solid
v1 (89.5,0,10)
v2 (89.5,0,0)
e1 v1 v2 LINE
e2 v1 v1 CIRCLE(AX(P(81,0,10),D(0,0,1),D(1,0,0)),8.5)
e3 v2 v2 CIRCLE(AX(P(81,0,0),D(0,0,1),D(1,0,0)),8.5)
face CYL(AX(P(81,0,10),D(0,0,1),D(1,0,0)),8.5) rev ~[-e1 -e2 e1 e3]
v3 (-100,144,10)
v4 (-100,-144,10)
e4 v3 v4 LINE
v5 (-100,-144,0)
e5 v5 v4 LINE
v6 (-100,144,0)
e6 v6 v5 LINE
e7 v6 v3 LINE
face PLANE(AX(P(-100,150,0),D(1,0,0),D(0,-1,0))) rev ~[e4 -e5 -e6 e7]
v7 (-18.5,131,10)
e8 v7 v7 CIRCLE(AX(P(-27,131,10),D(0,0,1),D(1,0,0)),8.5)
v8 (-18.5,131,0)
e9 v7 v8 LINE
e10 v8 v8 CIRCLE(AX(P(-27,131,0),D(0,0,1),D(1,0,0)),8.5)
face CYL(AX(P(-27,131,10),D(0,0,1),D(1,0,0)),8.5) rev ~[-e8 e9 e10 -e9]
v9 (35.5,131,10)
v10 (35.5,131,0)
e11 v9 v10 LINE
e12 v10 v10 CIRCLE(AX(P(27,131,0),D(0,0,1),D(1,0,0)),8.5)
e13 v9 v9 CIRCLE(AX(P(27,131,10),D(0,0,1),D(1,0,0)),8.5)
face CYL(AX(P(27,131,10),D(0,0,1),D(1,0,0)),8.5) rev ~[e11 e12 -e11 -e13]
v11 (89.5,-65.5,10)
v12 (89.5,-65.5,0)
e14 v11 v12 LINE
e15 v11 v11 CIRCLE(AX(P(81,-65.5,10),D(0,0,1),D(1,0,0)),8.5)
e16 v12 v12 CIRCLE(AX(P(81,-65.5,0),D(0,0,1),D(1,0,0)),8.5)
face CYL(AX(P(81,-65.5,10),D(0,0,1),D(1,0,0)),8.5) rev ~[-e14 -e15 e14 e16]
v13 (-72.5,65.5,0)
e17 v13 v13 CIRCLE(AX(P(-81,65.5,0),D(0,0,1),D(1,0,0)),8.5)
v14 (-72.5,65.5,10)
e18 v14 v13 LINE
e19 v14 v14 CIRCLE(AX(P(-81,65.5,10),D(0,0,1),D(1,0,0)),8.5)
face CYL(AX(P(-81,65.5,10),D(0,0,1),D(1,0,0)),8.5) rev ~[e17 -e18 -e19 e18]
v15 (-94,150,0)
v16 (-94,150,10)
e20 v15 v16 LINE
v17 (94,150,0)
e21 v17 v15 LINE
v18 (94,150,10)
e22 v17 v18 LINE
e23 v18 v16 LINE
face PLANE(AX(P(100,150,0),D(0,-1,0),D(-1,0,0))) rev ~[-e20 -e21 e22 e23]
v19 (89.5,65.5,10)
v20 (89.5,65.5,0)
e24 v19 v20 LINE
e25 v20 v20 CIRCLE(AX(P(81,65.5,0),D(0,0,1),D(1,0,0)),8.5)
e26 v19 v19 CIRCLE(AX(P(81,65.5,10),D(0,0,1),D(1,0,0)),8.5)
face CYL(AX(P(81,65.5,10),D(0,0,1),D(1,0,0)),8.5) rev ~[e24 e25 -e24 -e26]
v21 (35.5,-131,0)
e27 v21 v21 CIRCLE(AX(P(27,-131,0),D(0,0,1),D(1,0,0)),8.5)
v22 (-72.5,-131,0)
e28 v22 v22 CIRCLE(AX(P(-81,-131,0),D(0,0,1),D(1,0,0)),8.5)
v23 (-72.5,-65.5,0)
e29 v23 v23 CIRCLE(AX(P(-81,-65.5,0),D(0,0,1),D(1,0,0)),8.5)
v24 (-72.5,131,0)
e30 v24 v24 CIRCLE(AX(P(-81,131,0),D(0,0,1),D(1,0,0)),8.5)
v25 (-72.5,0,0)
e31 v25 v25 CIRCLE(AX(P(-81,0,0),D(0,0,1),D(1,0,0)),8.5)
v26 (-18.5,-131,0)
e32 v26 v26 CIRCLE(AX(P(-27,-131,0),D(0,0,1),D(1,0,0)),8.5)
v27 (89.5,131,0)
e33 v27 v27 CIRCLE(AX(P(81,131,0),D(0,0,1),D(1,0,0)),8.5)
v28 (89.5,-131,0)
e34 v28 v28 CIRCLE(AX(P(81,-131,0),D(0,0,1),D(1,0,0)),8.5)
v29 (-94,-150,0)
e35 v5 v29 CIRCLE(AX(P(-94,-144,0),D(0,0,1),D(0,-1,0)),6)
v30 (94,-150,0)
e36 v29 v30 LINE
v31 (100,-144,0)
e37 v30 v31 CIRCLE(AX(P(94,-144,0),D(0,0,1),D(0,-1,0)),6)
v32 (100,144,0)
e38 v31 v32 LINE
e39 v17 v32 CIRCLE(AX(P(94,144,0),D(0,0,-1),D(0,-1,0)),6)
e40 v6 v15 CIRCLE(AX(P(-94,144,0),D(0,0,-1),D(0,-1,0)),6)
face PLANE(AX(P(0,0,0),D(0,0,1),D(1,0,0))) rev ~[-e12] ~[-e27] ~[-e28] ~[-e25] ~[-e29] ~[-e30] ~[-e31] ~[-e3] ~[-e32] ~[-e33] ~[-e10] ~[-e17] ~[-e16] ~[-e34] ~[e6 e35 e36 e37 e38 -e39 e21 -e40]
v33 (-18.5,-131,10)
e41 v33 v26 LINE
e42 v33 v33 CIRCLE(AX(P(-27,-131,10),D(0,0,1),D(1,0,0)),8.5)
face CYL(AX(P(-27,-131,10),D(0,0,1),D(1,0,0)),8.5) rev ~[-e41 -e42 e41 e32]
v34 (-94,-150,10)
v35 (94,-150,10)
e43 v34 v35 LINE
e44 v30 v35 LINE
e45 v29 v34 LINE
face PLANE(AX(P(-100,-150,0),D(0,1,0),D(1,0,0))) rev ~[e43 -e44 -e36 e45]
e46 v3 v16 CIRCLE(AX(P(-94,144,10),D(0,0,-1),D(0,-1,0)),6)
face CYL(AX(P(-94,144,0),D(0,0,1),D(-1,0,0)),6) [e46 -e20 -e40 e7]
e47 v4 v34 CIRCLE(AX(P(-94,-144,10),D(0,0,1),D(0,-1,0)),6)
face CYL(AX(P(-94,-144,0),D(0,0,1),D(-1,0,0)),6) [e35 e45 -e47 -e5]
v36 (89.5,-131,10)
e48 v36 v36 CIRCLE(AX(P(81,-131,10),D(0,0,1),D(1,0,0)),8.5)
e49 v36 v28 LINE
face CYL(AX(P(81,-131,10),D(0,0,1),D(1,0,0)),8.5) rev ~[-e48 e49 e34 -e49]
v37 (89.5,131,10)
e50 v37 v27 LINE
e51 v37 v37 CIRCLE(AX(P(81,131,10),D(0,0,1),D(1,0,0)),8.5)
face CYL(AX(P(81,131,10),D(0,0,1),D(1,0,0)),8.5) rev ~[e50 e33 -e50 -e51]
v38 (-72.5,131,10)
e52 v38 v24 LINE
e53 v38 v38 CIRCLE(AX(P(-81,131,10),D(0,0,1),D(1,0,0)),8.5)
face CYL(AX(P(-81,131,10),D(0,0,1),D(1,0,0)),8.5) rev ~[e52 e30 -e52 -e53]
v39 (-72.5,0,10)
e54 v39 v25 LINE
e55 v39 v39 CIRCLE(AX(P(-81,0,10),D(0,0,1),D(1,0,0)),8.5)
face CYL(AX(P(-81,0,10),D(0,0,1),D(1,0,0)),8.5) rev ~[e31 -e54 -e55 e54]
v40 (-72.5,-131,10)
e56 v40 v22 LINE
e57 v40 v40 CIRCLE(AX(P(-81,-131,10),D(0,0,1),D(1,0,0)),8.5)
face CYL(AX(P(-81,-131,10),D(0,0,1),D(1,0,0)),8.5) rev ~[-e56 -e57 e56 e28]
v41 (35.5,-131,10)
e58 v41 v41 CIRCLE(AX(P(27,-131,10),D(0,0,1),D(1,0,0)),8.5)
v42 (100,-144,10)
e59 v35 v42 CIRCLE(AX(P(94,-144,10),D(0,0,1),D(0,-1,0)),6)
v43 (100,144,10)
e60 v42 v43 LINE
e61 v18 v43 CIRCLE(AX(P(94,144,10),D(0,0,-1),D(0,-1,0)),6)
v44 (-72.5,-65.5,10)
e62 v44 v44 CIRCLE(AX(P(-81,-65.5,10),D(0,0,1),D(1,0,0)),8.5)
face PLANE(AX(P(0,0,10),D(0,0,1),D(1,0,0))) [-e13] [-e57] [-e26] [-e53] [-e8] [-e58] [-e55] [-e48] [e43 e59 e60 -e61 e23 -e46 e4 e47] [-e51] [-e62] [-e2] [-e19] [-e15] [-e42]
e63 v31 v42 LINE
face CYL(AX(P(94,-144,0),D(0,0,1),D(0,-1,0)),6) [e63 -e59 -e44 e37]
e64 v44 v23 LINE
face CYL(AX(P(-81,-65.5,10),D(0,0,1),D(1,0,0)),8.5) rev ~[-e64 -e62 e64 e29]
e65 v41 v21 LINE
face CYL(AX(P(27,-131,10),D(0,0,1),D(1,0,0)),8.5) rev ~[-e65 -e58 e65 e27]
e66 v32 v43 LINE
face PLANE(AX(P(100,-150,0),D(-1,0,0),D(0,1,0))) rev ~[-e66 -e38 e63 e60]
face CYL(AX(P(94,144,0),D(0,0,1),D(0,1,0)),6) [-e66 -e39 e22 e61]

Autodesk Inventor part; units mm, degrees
ref_plane "YZ Plane" through (0, 0, 0) normal (1, 0, 0) x (0, 1, 0)
ref_plane "XZ Plane" through (0, 0, 0) normal (0, 1, 0) x (-1, 0, 0)
ref_plane "XY Plane" through (0, 0, 0) normal (0, 0, 1) x (1, 0, 0)
sketch "Sketch2" plane through (0, 0, 0) normal (0, 0, 1) x (1, 0, 0)
  line L0 (-50, -100) -> (50, -100)
  line L1 (50, -100) -> (50, 100)
  line L2 (50, 100) -> (-50, 100)
  line L3 (-50, 100) -> (-50, -100)
  line L4 (-50, -100) -> (50, 100) construction
  line L5 (50, -100) -> (-50, 100) construction
  line L6 (-100, -150) -> (100, -150)
  line L7 (100, -150) -> (100, 150)
  line L8 (100, 150) -> (-100, 150)
  line L9 (-100, 150) -> (-100, -150)
  point P0 (0, 0)
  dimension "d29" = 100
  dimension "d30" = 200
  dimension "d31" = 50
extrude "Plate2" add sketch "Sketch2" along normal blind 10 contours L3 L2 L1 L0 | L9 L8 L7 L6
sketch "Sketch5" plane through (0, 0, 10) normal (0, 0, 1) x (1, 0, 0)
  line L0 (100, -150) -> (-100, -150) construction
  line L1 (100, 150) -> (100, -150) construction
  line L2 (-100, 150) -> (100, 150) construction
  line L3 (-100, -150) -> (-100, 150) construction
  line L4 (-81, 131) -> (81, 131) construction
  line L5 (81, 131) -> (81, -131) construction
  line L6 (81, -131) -> (-81, -131) construction
  line L7 (-81, -131) -> (-81, 131) construction
  circle A0 centre (-81, -131) radius 8.5
  circle A1 centre (-81, 131) radius 8.5
  circle A2 centre (-81, 0) radius 8.5
  circle A3 centre (-81, -65.5) radius 8.5
  circle A4 centre (-81, 65.5) radius 8.5
  line L8 (-50, 0) -> (50, 0) construction
  circle A5 centre (-27, -131) radius 8.5
  circle A6 centre (-27, -65.5) radius 8.5
  circle A7 centre (-27, 0) radius 8.5
  circle A8 centre (-27, 65.5) radius 8.5
  circle A9 centre (-27, 131) radius 8.5
  circle A10 centre (27, -131) radius 8.5
  circle A11 centre (27, -65.5) radius 8.5
  circle A12 centre (27, 0) radius 8.5
  circle A13 centre (27, 65.5) radius 8.5
  circle A14 centre (27, 131) radius 8.5
  circle A15 centre (81, -131) radius 8.5
  circle A16 centre (81, -65.5) radius 8.5
  circle A17 centre (81, 0) radius 8.5
  circle A18 centre (81, 65.5) radius 8.5
  circle A19 centre (81, 131) radius 8.5
  point P0 (0, 0)
  point P1 (0, -131)
  dimension "d33" = 17
  dimension "d34" = 19
  dimension "d35" = 65.5
  dimension "d36" = 65.5
  dimension "d39" = 54
extrude "Cut3" cut sketch "Sketch5" against normal blind 10 contours A0 | A1 | A2 | A3 | A4 | A5 | A9 | A10 | A14 | A15 | A16 | A17 | A18 | A19
fillet "Corner Round1" radius 6 4 edges at (-100, -150, 5) (-100, 150, 5) (100, 150, 5) (100, -150, 5)
equation "\"d35\" = d36"
equation "\"d44\" = Thickness"
equation "\"d14\" = Thickness"
equation "\"BendReliefDepth\" = 0.5 * Thickness"
equation "\"TransitionRadius\" = BendRadius"
equation "\"JacobiRadiusSize\" = BendRadius"
equation "\"Thickness\" = 10"
equation "\"BendRadius\" = 6"
properties part number "PRS 1607 charging flange rect_D940" material "Steel"
